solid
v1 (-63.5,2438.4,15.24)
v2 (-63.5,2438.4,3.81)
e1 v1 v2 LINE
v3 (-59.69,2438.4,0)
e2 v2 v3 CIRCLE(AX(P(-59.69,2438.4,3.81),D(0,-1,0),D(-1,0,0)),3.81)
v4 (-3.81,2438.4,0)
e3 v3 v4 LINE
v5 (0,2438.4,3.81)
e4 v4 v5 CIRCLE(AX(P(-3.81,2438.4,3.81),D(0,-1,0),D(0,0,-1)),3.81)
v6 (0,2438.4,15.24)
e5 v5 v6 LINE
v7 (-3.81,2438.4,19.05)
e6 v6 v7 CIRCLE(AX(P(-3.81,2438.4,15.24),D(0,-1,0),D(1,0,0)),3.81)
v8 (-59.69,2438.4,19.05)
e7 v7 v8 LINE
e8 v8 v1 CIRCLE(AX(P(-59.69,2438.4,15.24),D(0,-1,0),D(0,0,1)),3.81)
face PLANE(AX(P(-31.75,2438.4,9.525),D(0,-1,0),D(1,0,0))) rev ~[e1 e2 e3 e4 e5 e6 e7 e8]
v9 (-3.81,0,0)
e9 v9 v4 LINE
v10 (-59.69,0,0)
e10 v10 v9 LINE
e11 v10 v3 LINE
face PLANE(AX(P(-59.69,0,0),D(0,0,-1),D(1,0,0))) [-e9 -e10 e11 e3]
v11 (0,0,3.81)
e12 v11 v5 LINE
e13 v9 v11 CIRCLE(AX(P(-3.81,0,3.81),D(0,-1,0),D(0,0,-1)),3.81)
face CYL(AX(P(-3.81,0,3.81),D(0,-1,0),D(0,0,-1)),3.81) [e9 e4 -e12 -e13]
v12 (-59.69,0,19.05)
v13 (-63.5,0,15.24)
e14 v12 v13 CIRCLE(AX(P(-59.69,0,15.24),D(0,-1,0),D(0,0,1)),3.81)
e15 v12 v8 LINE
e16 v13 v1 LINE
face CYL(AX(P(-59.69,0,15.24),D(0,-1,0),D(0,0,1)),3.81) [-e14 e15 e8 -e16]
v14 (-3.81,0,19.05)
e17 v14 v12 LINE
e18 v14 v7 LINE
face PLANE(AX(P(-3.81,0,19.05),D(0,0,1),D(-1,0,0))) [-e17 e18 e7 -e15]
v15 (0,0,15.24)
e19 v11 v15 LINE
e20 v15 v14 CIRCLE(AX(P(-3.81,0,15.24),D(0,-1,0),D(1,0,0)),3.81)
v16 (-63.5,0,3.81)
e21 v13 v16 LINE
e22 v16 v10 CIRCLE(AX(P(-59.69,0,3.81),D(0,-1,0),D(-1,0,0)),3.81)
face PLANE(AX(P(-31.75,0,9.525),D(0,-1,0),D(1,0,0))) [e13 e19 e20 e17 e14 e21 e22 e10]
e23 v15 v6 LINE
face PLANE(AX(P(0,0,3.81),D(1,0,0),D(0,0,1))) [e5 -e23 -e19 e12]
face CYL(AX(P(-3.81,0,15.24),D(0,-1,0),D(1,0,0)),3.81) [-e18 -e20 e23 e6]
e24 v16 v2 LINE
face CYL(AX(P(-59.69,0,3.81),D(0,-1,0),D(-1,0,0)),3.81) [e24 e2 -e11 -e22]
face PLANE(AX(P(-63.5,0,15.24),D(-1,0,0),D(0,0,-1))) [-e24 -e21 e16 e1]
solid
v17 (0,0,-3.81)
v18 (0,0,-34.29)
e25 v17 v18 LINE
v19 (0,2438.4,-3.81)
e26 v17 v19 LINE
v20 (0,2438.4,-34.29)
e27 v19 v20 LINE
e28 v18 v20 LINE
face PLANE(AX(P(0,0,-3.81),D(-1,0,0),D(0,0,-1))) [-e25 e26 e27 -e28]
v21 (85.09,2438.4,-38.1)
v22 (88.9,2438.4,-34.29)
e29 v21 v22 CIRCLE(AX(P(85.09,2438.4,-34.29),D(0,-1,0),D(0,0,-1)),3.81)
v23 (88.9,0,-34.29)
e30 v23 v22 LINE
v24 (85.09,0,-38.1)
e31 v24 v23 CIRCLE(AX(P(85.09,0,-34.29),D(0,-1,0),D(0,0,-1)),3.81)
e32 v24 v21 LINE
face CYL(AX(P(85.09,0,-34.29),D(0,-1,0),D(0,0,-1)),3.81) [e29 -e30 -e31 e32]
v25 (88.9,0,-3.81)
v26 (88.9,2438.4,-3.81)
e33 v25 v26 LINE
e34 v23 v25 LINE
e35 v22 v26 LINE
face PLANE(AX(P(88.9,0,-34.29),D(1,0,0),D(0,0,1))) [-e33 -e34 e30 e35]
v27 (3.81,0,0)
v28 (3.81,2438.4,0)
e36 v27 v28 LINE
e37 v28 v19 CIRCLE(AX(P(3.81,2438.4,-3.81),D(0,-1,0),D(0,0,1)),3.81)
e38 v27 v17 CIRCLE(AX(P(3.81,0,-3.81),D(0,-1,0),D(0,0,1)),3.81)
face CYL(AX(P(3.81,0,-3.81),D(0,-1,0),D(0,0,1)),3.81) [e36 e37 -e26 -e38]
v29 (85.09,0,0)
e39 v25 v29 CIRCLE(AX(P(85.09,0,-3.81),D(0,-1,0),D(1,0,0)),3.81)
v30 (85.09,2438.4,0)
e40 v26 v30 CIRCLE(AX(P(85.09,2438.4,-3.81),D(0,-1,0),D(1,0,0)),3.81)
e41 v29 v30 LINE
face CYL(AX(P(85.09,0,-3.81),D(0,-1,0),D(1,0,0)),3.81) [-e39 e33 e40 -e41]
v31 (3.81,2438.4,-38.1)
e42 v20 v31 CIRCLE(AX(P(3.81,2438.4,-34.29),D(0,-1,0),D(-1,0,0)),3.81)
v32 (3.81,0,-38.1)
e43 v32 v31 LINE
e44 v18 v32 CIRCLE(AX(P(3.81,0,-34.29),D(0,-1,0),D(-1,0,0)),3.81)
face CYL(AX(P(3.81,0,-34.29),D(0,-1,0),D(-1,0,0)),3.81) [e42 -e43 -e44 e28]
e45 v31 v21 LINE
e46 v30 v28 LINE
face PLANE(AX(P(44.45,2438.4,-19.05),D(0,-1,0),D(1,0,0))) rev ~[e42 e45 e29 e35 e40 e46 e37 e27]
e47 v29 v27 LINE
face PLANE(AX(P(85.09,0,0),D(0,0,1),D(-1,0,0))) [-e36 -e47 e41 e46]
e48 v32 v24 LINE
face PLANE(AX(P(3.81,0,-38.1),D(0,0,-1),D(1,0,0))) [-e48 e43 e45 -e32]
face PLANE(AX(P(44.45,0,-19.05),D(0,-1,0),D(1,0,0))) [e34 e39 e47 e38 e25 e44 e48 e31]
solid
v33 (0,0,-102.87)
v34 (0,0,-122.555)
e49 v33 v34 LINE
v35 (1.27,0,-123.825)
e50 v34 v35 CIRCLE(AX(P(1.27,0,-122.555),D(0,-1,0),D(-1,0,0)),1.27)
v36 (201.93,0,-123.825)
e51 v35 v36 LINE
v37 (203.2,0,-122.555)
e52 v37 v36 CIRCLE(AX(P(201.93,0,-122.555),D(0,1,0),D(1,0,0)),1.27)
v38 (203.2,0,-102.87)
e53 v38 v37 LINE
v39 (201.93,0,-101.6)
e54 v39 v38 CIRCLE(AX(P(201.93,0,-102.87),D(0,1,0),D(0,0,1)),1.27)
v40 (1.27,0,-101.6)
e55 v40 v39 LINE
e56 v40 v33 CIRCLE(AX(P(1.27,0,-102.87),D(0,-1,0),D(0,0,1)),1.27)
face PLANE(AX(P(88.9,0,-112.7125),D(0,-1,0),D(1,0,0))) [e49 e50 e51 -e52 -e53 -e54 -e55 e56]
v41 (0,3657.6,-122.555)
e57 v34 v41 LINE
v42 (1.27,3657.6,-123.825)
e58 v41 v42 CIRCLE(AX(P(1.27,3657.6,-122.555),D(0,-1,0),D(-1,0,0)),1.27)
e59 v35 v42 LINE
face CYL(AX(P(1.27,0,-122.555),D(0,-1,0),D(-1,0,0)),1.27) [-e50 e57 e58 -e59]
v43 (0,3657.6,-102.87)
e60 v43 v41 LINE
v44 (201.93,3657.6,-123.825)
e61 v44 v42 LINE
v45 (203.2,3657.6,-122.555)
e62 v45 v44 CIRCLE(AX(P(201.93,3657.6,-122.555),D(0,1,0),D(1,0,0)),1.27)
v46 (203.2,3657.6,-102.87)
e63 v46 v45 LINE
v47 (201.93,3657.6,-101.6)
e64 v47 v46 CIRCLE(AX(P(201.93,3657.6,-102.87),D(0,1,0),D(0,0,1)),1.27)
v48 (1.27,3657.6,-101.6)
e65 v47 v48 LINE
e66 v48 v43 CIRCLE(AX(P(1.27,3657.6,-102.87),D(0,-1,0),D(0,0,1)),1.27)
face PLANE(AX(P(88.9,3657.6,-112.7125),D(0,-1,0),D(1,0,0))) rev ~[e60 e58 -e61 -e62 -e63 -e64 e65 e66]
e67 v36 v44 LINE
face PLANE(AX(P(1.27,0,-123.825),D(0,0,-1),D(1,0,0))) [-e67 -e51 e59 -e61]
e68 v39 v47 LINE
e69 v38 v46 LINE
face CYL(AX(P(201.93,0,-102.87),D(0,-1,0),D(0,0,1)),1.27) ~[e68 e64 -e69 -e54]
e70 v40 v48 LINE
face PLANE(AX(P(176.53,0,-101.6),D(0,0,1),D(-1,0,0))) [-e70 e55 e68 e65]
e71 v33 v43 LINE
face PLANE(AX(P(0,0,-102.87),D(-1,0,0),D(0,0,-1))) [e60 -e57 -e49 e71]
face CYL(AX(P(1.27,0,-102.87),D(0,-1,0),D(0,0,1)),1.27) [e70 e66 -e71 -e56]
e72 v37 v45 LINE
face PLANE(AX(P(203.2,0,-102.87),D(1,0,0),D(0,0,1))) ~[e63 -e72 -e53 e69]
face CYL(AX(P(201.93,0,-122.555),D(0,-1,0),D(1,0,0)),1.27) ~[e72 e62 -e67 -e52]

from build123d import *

# Parameters (mm, degrees)
F1_DEPTH = 2438.4
F2_DEPTH = 2438.4
F3_DEPTH = 3657.6


# Not quite as in the source:
# - a pattern or mirror of a feature is missing from the dataset's text; its kind, count and spacing are read off the source's solid


with BuildPart() as f1:
    # F0 (on Front) → F1 (new body)
    with BuildSketch(Plane.XZ):
        with BuildLine():
            Line((85.09, 0), (3.81, 0))
            ThreePointArc((3.81, 0), (1.1159231637, -1.1159231637), (0, -3.81))
            Line((0, -3.81), (0, -34.29))
            ThreePointArc((0, -34.29), (1.1159231637, -36.9840768363), (3.81, -38.1))
            Line((3.81, -38.1), (85.09, -38.1))
            ThreePointArc((85.09, -38.1), (87.7840768363, -36.9840768363), (88.9, -34.29))
            Line((88.9, -34.29), (88.9, -3.81))
            ThreePointArc((88.9, -3.81), (87.7840768363, -1.1159231637), (85.09, 0))
        make_face()
    extrude(amount=-F1_DEPTH)


with BuildPart() as f2:
    # F0 (on Front) → F2 (new body)
    with BuildSketch(Plane.XZ):
        with BuildLine():
            Line((-59.69, 0), (-3.81, 0))
            ThreePointArc((-3.81, 0), (-1.1159231637, 1.1159231637), (0, 3.81))
            Line((0, 3.81), (0, 15.24))
            ThreePointArc((0, 15.24), (-1.1159231637, 17.9340768363), (-3.81, 19.05))
            Line((-3.81, 19.05), (-59.69, 19.05))
            ThreePointArc((-59.69, 19.05), (-62.3840768363, 17.9340768363), (-63.5, 15.24))
            Line((-63.5, 15.24), (-63.5, 3.81))
            ThreePointArc((-63.5, 3.81), (-62.3840768363, 1.1159231637), (-59.69, 0))
        make_face()
    extrude(amount=-F2_DEPTH)


with BuildPart() as f3:
    # F0 (on Front) → F3 (new body)
    with BuildSketch(Plane.XZ):
        with BuildLine():
            Line((176.53, -101.6), (1.27, -101.6))
            ThreePointArc((1.27, -101.6), (0.3719743879, -101.9719743879), (0, -102.87))
            Line((0, -102.87), (0, -122.555))
            ThreePointArc((0, -122.555), (0.3719743879, -123.4530256121), (1.27, -123.825))
            Line((1.27, -123.825), (176.53, -123.825))
            ThreePointArc((176.53, -123.825), (177.4280256121, -123.4530256121), (177.8, -122.555))
            Line((177.8, -122.555), (177.8, -102.87))
            ThreePointArc((177.8, -102.87), (177.4280256121, -101.9719743879), (176.53, -101.6))
        make_face()
    extrude(amount=-F3_DEPTH)

    # F3_copies: F3 across plane


with BuildPart() as f3_1:
    add(f3.part)
    add(f3.part.mirror(Plane(origin=(101.6, 0, 0), x_dir=(0, 0, 1), z_dir=(1, 0, 0))))


solid = Compound([f1.part, f2.part, f3_1.part])
